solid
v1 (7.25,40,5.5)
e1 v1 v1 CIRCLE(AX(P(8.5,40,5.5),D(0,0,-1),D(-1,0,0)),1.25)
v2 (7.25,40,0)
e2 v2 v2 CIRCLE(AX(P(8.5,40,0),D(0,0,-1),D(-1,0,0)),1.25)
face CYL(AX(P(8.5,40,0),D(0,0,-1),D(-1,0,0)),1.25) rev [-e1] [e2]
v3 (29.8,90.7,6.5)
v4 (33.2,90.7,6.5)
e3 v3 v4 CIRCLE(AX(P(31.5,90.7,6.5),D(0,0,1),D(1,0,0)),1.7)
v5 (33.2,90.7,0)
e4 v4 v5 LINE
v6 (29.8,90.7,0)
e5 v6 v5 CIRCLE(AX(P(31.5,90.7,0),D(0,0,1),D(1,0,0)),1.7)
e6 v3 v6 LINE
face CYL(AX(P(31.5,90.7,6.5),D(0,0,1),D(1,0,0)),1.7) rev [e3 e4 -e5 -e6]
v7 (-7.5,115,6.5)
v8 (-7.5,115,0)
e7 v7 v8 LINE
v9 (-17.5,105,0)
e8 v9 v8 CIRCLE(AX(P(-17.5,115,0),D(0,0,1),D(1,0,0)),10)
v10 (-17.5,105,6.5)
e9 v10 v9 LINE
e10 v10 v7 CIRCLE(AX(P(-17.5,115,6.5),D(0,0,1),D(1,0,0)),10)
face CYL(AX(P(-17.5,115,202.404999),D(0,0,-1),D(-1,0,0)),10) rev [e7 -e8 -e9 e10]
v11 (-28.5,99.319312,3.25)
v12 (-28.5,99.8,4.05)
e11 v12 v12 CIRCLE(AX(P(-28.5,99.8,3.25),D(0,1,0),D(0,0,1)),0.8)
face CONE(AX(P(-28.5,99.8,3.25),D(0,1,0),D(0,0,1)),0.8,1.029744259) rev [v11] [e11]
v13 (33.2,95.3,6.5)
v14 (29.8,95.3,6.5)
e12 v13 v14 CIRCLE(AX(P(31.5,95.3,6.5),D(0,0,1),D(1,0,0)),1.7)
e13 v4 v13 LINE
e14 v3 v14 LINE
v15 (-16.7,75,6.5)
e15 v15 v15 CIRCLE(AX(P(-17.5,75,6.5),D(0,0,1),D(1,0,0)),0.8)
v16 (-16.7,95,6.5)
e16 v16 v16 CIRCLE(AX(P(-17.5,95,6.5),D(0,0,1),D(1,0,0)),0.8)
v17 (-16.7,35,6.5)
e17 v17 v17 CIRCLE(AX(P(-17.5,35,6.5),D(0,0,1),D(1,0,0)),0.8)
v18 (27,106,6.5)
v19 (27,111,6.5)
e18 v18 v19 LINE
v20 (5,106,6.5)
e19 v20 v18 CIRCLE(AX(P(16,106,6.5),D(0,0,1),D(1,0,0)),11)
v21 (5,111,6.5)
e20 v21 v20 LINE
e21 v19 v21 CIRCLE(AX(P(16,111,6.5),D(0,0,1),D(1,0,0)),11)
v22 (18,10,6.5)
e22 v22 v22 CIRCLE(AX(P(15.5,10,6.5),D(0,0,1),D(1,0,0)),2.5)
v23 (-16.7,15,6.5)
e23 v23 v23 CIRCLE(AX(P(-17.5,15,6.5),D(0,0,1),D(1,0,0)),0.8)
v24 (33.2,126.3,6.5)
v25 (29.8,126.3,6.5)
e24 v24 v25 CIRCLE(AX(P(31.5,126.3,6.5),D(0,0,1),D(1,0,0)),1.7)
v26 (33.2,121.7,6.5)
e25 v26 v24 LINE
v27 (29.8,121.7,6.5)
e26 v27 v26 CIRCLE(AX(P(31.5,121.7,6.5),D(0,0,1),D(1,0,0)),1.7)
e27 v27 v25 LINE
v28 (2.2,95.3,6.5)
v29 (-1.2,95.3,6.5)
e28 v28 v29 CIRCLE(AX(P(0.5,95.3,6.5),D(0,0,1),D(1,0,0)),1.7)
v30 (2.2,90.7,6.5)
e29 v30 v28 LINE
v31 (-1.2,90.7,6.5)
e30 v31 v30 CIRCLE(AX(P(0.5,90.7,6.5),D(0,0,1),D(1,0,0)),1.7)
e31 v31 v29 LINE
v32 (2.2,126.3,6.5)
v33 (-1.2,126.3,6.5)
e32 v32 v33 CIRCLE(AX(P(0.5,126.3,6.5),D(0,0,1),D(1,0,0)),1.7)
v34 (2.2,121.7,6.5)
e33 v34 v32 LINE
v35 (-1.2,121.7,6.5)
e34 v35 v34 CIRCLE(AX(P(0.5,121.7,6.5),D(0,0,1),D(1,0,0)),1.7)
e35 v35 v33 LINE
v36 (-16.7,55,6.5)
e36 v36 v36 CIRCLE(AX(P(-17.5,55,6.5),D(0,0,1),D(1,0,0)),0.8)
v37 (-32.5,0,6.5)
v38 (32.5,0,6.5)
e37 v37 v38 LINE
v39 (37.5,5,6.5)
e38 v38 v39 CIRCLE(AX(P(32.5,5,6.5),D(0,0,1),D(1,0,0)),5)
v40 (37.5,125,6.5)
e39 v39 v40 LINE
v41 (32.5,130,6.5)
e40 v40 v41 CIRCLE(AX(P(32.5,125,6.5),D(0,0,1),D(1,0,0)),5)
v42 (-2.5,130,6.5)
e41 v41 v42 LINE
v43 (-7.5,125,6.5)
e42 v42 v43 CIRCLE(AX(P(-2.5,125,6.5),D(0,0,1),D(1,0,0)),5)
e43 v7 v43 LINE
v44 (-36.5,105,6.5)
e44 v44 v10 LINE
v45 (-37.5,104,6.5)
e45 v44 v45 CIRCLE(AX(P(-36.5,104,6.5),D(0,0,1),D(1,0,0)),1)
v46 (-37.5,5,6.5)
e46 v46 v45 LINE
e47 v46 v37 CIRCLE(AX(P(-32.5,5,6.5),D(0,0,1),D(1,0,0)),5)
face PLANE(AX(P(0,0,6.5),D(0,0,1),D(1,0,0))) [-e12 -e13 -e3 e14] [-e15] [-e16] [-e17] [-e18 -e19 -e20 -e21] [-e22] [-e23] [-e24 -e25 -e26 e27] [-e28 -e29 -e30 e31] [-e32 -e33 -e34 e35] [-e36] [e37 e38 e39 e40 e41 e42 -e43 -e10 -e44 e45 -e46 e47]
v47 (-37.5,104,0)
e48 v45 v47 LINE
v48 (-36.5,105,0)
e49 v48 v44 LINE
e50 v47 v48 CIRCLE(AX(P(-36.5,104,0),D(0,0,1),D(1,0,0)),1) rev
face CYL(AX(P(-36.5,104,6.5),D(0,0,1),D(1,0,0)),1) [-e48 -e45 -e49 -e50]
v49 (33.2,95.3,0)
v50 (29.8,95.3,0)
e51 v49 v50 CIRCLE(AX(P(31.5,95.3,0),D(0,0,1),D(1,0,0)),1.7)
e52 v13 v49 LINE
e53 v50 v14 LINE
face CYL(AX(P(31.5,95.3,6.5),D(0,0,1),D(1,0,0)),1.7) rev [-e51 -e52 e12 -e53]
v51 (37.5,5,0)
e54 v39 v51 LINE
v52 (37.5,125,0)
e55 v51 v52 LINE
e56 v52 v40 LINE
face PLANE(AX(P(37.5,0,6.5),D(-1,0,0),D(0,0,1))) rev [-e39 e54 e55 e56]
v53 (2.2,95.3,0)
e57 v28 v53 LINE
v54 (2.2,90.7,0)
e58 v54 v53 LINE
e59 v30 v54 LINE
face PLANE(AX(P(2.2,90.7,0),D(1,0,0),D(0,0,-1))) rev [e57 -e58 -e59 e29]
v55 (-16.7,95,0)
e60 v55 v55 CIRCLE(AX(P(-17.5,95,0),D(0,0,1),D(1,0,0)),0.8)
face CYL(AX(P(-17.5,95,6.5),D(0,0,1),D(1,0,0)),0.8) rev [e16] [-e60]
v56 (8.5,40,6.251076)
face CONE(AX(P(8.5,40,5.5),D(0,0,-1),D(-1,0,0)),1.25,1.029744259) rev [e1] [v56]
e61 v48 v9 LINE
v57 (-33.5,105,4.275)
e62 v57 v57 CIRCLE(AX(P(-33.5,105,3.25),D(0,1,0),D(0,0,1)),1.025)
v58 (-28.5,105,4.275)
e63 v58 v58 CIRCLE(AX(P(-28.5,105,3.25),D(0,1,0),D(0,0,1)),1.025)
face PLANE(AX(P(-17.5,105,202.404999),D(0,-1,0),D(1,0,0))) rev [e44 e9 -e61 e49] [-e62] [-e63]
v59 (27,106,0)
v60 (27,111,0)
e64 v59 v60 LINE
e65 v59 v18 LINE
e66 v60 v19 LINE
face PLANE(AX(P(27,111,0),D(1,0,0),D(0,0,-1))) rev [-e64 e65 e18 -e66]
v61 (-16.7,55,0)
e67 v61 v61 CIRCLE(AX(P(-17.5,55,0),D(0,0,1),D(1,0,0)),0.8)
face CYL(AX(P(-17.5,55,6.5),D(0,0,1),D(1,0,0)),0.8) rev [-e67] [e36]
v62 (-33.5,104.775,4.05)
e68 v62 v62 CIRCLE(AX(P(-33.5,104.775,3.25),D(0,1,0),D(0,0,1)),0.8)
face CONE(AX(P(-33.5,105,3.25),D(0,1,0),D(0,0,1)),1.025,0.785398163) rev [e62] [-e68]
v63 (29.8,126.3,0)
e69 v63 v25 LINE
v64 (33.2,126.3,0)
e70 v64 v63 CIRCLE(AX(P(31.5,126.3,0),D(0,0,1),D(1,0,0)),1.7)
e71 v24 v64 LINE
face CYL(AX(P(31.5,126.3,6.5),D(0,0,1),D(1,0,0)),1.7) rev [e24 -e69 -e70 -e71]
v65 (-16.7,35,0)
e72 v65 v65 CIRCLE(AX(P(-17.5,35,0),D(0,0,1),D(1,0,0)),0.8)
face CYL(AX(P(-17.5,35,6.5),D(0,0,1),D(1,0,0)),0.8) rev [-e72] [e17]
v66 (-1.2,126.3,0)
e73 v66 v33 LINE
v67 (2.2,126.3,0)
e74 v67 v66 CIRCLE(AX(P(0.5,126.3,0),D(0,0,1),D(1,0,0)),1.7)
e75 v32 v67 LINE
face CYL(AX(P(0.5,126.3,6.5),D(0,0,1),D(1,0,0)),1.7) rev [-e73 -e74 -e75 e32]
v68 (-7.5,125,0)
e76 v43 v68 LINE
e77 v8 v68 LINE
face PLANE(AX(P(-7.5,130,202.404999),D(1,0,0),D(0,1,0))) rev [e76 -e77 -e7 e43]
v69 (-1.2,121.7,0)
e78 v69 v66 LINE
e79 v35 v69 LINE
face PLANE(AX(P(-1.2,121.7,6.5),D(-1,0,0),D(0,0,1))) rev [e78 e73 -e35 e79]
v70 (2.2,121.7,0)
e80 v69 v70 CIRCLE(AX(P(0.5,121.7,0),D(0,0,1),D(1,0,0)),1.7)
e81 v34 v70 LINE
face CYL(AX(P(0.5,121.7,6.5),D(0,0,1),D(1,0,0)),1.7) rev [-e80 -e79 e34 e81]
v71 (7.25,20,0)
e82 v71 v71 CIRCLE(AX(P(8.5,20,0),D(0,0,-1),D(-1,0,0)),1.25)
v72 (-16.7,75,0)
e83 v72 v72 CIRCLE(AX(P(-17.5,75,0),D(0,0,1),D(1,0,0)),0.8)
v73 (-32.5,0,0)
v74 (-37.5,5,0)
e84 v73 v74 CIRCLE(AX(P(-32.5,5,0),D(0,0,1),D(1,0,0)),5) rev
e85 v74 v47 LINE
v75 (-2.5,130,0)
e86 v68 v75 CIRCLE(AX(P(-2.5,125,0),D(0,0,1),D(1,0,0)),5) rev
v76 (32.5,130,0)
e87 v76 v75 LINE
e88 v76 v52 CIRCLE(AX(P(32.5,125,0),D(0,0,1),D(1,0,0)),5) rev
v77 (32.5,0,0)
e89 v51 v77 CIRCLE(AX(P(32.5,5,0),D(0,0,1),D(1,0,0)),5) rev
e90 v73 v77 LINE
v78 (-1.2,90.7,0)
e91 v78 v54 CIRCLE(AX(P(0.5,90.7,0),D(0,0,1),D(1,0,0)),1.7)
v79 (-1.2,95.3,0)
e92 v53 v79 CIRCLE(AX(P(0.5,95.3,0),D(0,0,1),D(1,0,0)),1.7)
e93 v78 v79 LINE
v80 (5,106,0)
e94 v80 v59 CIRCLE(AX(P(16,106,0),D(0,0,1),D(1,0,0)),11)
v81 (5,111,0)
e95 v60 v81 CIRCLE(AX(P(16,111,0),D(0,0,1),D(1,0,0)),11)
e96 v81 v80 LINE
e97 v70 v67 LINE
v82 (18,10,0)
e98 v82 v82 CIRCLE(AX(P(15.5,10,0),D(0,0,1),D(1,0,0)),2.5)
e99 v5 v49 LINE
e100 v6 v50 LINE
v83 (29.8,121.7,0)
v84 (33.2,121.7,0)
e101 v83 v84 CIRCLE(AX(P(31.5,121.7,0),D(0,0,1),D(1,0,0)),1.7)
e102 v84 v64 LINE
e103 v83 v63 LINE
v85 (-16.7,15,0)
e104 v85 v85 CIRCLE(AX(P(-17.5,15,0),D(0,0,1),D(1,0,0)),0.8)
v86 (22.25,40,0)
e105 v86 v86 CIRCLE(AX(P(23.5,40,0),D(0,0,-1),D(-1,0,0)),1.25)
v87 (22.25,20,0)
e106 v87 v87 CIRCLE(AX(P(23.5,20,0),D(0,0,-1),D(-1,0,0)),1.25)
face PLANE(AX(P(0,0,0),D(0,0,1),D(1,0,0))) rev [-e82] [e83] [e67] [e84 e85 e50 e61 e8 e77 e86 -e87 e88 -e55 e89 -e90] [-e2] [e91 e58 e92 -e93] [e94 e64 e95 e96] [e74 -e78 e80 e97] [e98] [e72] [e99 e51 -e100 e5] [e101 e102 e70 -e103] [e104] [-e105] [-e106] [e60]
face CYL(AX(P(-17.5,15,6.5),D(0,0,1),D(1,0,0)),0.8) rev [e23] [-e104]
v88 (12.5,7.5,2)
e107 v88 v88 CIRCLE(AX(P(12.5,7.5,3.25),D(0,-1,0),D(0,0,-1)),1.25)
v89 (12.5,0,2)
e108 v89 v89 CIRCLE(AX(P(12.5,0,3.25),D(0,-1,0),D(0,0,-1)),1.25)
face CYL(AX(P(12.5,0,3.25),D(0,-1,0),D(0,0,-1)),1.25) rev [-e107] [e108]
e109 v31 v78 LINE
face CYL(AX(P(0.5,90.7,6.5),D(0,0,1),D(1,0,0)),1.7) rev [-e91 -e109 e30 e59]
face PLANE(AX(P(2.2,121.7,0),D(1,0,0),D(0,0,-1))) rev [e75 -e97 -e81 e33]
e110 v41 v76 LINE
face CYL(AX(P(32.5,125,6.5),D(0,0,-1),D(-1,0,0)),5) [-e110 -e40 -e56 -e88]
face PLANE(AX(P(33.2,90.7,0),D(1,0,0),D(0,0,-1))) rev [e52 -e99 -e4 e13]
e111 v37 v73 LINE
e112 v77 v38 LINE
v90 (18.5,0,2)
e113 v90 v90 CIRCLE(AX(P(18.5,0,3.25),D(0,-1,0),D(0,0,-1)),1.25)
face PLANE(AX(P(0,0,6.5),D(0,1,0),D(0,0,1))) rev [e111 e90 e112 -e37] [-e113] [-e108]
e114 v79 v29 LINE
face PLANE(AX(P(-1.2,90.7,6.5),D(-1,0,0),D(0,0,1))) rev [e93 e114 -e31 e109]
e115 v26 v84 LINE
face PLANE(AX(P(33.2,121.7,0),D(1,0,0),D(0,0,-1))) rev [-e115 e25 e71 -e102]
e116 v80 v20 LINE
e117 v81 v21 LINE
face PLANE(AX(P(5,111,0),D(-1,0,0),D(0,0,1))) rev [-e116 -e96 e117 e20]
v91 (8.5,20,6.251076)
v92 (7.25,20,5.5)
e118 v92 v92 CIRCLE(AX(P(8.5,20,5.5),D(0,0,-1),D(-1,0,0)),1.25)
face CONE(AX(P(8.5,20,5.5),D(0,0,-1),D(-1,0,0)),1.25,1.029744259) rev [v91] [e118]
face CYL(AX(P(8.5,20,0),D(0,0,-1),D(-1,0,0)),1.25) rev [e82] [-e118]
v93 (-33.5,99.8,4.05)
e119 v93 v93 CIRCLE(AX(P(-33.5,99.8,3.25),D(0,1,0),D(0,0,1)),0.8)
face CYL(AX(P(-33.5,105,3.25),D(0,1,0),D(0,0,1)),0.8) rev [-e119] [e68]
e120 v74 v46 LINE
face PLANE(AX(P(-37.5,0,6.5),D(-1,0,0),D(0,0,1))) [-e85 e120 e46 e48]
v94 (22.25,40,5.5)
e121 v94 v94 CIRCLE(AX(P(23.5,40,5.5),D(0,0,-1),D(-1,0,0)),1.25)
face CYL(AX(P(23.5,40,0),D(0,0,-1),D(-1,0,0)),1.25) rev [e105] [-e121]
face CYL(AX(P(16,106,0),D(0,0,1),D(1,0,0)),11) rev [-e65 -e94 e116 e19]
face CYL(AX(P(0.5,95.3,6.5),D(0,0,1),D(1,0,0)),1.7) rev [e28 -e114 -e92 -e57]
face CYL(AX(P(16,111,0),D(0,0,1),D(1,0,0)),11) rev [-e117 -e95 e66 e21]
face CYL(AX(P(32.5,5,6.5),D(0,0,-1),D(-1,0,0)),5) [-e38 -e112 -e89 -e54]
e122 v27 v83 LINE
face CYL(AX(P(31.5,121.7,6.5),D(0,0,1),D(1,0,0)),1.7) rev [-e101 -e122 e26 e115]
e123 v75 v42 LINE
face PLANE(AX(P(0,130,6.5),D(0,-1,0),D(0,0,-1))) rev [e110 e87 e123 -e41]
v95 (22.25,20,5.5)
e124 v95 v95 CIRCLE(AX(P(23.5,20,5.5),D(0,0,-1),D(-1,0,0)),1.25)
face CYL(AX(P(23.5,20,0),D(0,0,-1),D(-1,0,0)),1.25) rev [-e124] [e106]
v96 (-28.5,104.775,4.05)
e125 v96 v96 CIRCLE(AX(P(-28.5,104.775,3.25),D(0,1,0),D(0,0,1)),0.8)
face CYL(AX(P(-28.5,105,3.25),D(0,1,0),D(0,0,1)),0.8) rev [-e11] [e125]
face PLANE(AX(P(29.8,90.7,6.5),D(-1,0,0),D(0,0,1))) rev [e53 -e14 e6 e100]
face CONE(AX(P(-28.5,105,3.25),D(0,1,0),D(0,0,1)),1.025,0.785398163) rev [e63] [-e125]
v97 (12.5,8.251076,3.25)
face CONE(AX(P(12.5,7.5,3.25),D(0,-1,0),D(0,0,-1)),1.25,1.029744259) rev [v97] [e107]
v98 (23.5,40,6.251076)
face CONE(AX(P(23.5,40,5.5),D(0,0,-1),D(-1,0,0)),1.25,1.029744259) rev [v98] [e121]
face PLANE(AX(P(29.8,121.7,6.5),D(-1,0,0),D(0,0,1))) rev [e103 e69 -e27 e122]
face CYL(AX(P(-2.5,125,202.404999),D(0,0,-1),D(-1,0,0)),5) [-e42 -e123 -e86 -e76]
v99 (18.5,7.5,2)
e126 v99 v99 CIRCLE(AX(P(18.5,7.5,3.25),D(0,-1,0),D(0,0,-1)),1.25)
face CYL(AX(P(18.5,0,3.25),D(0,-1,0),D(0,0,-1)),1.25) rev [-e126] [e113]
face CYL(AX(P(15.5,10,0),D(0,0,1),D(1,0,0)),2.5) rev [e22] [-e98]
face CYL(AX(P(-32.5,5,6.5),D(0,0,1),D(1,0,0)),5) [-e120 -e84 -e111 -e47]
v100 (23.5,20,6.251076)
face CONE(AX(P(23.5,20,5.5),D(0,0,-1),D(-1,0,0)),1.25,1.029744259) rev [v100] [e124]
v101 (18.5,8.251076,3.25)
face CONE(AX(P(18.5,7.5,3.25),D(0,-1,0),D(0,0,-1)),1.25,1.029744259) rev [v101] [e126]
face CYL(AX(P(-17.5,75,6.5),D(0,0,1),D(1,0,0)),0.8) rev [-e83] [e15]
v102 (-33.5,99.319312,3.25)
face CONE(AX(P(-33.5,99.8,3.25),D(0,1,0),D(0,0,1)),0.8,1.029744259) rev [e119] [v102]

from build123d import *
from OCP.BRepFilletAPI import BRepFilletAPI_MakeFillet

# Parameters (mm, degrees)
SKETCH1_W                         = 37.5
SKETCH1_H                         = 130
MOUNTING_PLATE_DEPTH              = 6.5
M3_CLEARANCE_SLOT1_DEPTH          = 6.5
LPATTERN4_COUNT                   = 2
LPATTERN4_PITCH                   = 31
LPATTERN4_COUNT_DIR2              = 2
LPATTERN4_PITCH_DIR2              = 31
CUT_EXTRUDE3_DEPTH                = 136.456635127
LIMIT_SWITCH_PLACEMENT_DEPTH      = 136.456635127
LIMIT_SWITCH_PLACEMENT_DEPTH_BACK = 136.456635127
M2X0_4_TAPPED_HOLE3_D             = 1.6
LPATTERN5_COUNT                   = 5
LPATTERN5_PITCH                   = 20
FILLET1_R1                        = 5
FILLET1_R2                        = 1
M3X0_5_TAPPED_HOLE1_D             = 2.5
M3X0_5_TAPPED_HOLE1_DEPTH         = 7.5
M3X0_5_TAPPED_HOLE1_TIP           = 0.751075774
LPATTERN3_COUNT                   = 2
LPATTERN3_PITCH                   = 5
LPATTERN6_COUNT                   = 2
LPATTERN6_PITCH                   = 15
LPATTERN6_COUNT_DIR2              = 2
LPATTERN6_PITCH_DIR2              = 20
SKETCH30_R                        = 2.5
CUT_EXTRUDE4_DEPTH                = 136.456635127


# Read off the part's stored shape, not the designer's step: M3 Clearance Slot1
with BuildPart() as part:
    # Sketch1 → Mounting Plate (new body)
    with BuildSketch(Plane.XY):
        with Locations((-18.75, 65)):
            Rectangle(SKETCH1_W, SKETCH1_H)
        with Locations((18.75, 65)):
            Rectangle(SKETCH1_W, SKETCH1_H)
    extrude(amount=MOUNTING_PLATE_DEPTH)

    # M3 Clearance Slot1 outline → M3 Clearance Slot1 (cut)
    with BuildSketch(Plane.XY):
        with BuildLine():
            Line((2.2, 121.7), (2.2, 126.3))
            ThreePointArc((2.2, 126.3), (0.5, 128), (-1.2, 126.3))
            Line((-1.2, 126.3), (-1.2, 121.7))
            ThreePointArc((-1.2, 121.7), (0.5, 120), (2.2, 121.7))
        make_face()
    m3_clearance_slot1 = extrude(amount=M3_CLEARANCE_SLOT1_DEPTH, mode=Mode.SUBTRACT)

    # LPattern4: M3 Clearance Slot1 2 × 2
    with Locations(*[(i * LPATTERN4_PITCH, -j * LPATTERN4_PITCH_DIR2, 0) for i in range(LPATTERN4_COUNT) for j in range(LPATTERN4_COUNT_DIR2) if (i, j) != (0, 0)]):
        add(m3_clearance_slot1, mode=Mode.SUBTRACT)

    # Sketch23 → Cut-Extrude3 (cut, through all)
    with BuildSketch(Plane.XY.offset(6.5)):
        with BuildLine():
            Line((27, 111), (27, 106))
            ThreePointArc((27, 106), (16, 95), (5, 106))
            Line((5, 106), (5, 111))
            ThreePointArc((5, 111), (16, 122), (27, 111))
        make_face()
    extrude(amount=-CUT_EXTRUDE3_DEPTH, mode=Mode.SUBTRACT)

    # Sketch2 → Limit Switch Placement (cut, two sides: drawn at the far end of the back side and taken through both)
    with BuildSketch(Plane.XY.offset(6.5).offset(-LIMIT_SWITCH_PLACEMENT_DEPTH_BACK)):
        with BuildLine():
            Line((-7.5, 415.136329844), (-7.5, 130))
            Line((-7.5, 130), (-7.5, 115))
            ThreePointArc((-7.5, 115), (-10.428932188, 107.928932188), (-17.5, 105))
            Line((-17.5, 105), (-37.5, 105))
            Line((-37.5, 105), (-322.636329844, 105))
            Line((-322.636329844, 105), (-722.642663203, 511.455212366))
            Line((-722.642663203, 511.455212366), (-407.50633336, 821.59154221))
            Line((-407.50633336, 821.59154221), (-7.5, 415.136329844))
        make_face()
    extrude(amount=LIMIT_SWITCH_PLACEMENT_DEPTH + LIMIT_SWITCH_PLACEMENT_DEPTH_BACK, mode=Mode.SUBTRACT)

    # M2x0.4 Tapped Hole3 (through all)
    with Locations(Plane.XY.offset(6.5)):
        with Locations((-17.5, 95)):
            m2x0_4_tapped_hole3 = Hole(M2X0_4_TAPPED_HOLE3_D / 2)

    # LPattern5: M2x0.4 Tapped Hole3 ×5
    with Locations(*[(0, -i * LPATTERN5_PITCH, 0) for i in range(1, LPATTERN5_COUNT)]):
        add(m2x0_4_tapped_hole3, mode=Mode.SUBTRACT)

    # Fillet1: one fillet with a radius per group of edges: ONE call of the kernel's fillet builder (fillet() takes one radius for all edges)
    fillet1_edges_1 = [part.edges().sort_by_distance(p)[0] for p in [
        (37.5, 130, 3.25),
        (37.5, 0, 3.25),
        (-37.5, 0, 3.25),
        (-7.5, 130, 3.25),
    ]]
    fillet1_edges_2 = [part.edges().sort_by_distance(p)[0] for p in [
        (-37.5, 105, 3.25),
    ]]
    fillet1 = BRepFilletAPI_MakeFillet(part.part.solid().wrapped)
    for e in fillet1_edges_1:
        fillet1.Add(FILLET1_R1, e.wrapped)
    for e in fillet1_edges_2:
        fillet1.Add(FILLET1_R2, e.wrapped)
    add(Compound.cast(fillet1.Shape()), mode=Mode.REPLACE)

    # M3x0.5 Tapped Hole1
    with Locations(Plane(origin=(0, 0, 0), x_dir=(-1, 0, 0), z_dir=(0, -1, 0))):
        with Locations((-18.5, -3.25), (-12.5, -3.25)):
            Hole(M3X0_5_TAPPED_HOLE1_D / 2, depth=M3X0_5_TAPPED_HOLE1_DEPTH)
            with Locations((0, 0, -(M3X0_5_TAPPED_HOLE1_DEPTH + M3X0_5_TAPPED_HOLE1_TIP / 2))):  # 118° drill point
                Cone(0, M3X0_5_TAPPED_HOLE1_D / 2, M3X0_5_TAPPED_HOLE1_TIP, mode=Mode.SUBTRACT)

    # Sketch15 → M2x0.4 Tapped Hole2 (revolve, cut)
    with BuildSketch(Plane(origin=(-33.5, 105, 3.25), x_dir=(0, 0, 1), z_dir=(1, 0, 0))):
        Polygon((0, 0), (0, 5.680688495), (0.8, 5.2), (0.8, 0.225), (1.025, 0), align=None)
    m2x0_4_tapped_hole2 = revolve(axis=Axis((-33.5, 111.35, 3.25), (0, -1, 0)), mode=Mode.SUBTRACT)

    # LPattern3: M2x0.4 Tapped Hole2 ×2
    with Locations(*[(i * LPATTERN3_PITCH, 0, 0) for i in range(1, LPATTERN3_COUNT)]):
        add(m2x0_4_tapped_hole2, mode=Mode.SUBTRACT)

    # Sketch29 → M3x0.5 Tapped Hole4 (revolve, cut)
    with BuildSketch(Plane(origin=(23.5, 40, 0), x_dir=(0, 1, 0), z_dir=(1, 0, 0))):
        Polygon((0, 0), (0, 6.251075774), (1.25, 5.5), (1.25, 0), align=None)
    m3x0_5_tapped_hole4 = revolve(axis=Axis((23.5, 40, -6.35), (0, 0, 1)), mode=Mode.SUBTRACT)

    # LPattern6: M3x0.5 Tapped Hole4 2 × 2
    with Locations(*[(-i * LPATTERN6_PITCH, -j * LPATTERN6_PITCH_DIR2, 0) for i in range(LPATTERN6_COUNT) for j in range(LPATTERN6_COUNT_DIR2) if (i, j) != (0, 0)]):
        add(m3x0_5_tapped_hole4, mode=Mode.SUBTRACT)

    # Sketch30 → Cut-Extrude4 (cut, through all)
    with BuildSketch(Plane.XY.offset(6.5)):
        with Locations((15.5, 10)):
            Circle(SKETCH30_R)
    extrude(amount=-CUT_EXTRUDE4_DEPTH, mode=Mode.SUBTRACT)


solid = part.part
